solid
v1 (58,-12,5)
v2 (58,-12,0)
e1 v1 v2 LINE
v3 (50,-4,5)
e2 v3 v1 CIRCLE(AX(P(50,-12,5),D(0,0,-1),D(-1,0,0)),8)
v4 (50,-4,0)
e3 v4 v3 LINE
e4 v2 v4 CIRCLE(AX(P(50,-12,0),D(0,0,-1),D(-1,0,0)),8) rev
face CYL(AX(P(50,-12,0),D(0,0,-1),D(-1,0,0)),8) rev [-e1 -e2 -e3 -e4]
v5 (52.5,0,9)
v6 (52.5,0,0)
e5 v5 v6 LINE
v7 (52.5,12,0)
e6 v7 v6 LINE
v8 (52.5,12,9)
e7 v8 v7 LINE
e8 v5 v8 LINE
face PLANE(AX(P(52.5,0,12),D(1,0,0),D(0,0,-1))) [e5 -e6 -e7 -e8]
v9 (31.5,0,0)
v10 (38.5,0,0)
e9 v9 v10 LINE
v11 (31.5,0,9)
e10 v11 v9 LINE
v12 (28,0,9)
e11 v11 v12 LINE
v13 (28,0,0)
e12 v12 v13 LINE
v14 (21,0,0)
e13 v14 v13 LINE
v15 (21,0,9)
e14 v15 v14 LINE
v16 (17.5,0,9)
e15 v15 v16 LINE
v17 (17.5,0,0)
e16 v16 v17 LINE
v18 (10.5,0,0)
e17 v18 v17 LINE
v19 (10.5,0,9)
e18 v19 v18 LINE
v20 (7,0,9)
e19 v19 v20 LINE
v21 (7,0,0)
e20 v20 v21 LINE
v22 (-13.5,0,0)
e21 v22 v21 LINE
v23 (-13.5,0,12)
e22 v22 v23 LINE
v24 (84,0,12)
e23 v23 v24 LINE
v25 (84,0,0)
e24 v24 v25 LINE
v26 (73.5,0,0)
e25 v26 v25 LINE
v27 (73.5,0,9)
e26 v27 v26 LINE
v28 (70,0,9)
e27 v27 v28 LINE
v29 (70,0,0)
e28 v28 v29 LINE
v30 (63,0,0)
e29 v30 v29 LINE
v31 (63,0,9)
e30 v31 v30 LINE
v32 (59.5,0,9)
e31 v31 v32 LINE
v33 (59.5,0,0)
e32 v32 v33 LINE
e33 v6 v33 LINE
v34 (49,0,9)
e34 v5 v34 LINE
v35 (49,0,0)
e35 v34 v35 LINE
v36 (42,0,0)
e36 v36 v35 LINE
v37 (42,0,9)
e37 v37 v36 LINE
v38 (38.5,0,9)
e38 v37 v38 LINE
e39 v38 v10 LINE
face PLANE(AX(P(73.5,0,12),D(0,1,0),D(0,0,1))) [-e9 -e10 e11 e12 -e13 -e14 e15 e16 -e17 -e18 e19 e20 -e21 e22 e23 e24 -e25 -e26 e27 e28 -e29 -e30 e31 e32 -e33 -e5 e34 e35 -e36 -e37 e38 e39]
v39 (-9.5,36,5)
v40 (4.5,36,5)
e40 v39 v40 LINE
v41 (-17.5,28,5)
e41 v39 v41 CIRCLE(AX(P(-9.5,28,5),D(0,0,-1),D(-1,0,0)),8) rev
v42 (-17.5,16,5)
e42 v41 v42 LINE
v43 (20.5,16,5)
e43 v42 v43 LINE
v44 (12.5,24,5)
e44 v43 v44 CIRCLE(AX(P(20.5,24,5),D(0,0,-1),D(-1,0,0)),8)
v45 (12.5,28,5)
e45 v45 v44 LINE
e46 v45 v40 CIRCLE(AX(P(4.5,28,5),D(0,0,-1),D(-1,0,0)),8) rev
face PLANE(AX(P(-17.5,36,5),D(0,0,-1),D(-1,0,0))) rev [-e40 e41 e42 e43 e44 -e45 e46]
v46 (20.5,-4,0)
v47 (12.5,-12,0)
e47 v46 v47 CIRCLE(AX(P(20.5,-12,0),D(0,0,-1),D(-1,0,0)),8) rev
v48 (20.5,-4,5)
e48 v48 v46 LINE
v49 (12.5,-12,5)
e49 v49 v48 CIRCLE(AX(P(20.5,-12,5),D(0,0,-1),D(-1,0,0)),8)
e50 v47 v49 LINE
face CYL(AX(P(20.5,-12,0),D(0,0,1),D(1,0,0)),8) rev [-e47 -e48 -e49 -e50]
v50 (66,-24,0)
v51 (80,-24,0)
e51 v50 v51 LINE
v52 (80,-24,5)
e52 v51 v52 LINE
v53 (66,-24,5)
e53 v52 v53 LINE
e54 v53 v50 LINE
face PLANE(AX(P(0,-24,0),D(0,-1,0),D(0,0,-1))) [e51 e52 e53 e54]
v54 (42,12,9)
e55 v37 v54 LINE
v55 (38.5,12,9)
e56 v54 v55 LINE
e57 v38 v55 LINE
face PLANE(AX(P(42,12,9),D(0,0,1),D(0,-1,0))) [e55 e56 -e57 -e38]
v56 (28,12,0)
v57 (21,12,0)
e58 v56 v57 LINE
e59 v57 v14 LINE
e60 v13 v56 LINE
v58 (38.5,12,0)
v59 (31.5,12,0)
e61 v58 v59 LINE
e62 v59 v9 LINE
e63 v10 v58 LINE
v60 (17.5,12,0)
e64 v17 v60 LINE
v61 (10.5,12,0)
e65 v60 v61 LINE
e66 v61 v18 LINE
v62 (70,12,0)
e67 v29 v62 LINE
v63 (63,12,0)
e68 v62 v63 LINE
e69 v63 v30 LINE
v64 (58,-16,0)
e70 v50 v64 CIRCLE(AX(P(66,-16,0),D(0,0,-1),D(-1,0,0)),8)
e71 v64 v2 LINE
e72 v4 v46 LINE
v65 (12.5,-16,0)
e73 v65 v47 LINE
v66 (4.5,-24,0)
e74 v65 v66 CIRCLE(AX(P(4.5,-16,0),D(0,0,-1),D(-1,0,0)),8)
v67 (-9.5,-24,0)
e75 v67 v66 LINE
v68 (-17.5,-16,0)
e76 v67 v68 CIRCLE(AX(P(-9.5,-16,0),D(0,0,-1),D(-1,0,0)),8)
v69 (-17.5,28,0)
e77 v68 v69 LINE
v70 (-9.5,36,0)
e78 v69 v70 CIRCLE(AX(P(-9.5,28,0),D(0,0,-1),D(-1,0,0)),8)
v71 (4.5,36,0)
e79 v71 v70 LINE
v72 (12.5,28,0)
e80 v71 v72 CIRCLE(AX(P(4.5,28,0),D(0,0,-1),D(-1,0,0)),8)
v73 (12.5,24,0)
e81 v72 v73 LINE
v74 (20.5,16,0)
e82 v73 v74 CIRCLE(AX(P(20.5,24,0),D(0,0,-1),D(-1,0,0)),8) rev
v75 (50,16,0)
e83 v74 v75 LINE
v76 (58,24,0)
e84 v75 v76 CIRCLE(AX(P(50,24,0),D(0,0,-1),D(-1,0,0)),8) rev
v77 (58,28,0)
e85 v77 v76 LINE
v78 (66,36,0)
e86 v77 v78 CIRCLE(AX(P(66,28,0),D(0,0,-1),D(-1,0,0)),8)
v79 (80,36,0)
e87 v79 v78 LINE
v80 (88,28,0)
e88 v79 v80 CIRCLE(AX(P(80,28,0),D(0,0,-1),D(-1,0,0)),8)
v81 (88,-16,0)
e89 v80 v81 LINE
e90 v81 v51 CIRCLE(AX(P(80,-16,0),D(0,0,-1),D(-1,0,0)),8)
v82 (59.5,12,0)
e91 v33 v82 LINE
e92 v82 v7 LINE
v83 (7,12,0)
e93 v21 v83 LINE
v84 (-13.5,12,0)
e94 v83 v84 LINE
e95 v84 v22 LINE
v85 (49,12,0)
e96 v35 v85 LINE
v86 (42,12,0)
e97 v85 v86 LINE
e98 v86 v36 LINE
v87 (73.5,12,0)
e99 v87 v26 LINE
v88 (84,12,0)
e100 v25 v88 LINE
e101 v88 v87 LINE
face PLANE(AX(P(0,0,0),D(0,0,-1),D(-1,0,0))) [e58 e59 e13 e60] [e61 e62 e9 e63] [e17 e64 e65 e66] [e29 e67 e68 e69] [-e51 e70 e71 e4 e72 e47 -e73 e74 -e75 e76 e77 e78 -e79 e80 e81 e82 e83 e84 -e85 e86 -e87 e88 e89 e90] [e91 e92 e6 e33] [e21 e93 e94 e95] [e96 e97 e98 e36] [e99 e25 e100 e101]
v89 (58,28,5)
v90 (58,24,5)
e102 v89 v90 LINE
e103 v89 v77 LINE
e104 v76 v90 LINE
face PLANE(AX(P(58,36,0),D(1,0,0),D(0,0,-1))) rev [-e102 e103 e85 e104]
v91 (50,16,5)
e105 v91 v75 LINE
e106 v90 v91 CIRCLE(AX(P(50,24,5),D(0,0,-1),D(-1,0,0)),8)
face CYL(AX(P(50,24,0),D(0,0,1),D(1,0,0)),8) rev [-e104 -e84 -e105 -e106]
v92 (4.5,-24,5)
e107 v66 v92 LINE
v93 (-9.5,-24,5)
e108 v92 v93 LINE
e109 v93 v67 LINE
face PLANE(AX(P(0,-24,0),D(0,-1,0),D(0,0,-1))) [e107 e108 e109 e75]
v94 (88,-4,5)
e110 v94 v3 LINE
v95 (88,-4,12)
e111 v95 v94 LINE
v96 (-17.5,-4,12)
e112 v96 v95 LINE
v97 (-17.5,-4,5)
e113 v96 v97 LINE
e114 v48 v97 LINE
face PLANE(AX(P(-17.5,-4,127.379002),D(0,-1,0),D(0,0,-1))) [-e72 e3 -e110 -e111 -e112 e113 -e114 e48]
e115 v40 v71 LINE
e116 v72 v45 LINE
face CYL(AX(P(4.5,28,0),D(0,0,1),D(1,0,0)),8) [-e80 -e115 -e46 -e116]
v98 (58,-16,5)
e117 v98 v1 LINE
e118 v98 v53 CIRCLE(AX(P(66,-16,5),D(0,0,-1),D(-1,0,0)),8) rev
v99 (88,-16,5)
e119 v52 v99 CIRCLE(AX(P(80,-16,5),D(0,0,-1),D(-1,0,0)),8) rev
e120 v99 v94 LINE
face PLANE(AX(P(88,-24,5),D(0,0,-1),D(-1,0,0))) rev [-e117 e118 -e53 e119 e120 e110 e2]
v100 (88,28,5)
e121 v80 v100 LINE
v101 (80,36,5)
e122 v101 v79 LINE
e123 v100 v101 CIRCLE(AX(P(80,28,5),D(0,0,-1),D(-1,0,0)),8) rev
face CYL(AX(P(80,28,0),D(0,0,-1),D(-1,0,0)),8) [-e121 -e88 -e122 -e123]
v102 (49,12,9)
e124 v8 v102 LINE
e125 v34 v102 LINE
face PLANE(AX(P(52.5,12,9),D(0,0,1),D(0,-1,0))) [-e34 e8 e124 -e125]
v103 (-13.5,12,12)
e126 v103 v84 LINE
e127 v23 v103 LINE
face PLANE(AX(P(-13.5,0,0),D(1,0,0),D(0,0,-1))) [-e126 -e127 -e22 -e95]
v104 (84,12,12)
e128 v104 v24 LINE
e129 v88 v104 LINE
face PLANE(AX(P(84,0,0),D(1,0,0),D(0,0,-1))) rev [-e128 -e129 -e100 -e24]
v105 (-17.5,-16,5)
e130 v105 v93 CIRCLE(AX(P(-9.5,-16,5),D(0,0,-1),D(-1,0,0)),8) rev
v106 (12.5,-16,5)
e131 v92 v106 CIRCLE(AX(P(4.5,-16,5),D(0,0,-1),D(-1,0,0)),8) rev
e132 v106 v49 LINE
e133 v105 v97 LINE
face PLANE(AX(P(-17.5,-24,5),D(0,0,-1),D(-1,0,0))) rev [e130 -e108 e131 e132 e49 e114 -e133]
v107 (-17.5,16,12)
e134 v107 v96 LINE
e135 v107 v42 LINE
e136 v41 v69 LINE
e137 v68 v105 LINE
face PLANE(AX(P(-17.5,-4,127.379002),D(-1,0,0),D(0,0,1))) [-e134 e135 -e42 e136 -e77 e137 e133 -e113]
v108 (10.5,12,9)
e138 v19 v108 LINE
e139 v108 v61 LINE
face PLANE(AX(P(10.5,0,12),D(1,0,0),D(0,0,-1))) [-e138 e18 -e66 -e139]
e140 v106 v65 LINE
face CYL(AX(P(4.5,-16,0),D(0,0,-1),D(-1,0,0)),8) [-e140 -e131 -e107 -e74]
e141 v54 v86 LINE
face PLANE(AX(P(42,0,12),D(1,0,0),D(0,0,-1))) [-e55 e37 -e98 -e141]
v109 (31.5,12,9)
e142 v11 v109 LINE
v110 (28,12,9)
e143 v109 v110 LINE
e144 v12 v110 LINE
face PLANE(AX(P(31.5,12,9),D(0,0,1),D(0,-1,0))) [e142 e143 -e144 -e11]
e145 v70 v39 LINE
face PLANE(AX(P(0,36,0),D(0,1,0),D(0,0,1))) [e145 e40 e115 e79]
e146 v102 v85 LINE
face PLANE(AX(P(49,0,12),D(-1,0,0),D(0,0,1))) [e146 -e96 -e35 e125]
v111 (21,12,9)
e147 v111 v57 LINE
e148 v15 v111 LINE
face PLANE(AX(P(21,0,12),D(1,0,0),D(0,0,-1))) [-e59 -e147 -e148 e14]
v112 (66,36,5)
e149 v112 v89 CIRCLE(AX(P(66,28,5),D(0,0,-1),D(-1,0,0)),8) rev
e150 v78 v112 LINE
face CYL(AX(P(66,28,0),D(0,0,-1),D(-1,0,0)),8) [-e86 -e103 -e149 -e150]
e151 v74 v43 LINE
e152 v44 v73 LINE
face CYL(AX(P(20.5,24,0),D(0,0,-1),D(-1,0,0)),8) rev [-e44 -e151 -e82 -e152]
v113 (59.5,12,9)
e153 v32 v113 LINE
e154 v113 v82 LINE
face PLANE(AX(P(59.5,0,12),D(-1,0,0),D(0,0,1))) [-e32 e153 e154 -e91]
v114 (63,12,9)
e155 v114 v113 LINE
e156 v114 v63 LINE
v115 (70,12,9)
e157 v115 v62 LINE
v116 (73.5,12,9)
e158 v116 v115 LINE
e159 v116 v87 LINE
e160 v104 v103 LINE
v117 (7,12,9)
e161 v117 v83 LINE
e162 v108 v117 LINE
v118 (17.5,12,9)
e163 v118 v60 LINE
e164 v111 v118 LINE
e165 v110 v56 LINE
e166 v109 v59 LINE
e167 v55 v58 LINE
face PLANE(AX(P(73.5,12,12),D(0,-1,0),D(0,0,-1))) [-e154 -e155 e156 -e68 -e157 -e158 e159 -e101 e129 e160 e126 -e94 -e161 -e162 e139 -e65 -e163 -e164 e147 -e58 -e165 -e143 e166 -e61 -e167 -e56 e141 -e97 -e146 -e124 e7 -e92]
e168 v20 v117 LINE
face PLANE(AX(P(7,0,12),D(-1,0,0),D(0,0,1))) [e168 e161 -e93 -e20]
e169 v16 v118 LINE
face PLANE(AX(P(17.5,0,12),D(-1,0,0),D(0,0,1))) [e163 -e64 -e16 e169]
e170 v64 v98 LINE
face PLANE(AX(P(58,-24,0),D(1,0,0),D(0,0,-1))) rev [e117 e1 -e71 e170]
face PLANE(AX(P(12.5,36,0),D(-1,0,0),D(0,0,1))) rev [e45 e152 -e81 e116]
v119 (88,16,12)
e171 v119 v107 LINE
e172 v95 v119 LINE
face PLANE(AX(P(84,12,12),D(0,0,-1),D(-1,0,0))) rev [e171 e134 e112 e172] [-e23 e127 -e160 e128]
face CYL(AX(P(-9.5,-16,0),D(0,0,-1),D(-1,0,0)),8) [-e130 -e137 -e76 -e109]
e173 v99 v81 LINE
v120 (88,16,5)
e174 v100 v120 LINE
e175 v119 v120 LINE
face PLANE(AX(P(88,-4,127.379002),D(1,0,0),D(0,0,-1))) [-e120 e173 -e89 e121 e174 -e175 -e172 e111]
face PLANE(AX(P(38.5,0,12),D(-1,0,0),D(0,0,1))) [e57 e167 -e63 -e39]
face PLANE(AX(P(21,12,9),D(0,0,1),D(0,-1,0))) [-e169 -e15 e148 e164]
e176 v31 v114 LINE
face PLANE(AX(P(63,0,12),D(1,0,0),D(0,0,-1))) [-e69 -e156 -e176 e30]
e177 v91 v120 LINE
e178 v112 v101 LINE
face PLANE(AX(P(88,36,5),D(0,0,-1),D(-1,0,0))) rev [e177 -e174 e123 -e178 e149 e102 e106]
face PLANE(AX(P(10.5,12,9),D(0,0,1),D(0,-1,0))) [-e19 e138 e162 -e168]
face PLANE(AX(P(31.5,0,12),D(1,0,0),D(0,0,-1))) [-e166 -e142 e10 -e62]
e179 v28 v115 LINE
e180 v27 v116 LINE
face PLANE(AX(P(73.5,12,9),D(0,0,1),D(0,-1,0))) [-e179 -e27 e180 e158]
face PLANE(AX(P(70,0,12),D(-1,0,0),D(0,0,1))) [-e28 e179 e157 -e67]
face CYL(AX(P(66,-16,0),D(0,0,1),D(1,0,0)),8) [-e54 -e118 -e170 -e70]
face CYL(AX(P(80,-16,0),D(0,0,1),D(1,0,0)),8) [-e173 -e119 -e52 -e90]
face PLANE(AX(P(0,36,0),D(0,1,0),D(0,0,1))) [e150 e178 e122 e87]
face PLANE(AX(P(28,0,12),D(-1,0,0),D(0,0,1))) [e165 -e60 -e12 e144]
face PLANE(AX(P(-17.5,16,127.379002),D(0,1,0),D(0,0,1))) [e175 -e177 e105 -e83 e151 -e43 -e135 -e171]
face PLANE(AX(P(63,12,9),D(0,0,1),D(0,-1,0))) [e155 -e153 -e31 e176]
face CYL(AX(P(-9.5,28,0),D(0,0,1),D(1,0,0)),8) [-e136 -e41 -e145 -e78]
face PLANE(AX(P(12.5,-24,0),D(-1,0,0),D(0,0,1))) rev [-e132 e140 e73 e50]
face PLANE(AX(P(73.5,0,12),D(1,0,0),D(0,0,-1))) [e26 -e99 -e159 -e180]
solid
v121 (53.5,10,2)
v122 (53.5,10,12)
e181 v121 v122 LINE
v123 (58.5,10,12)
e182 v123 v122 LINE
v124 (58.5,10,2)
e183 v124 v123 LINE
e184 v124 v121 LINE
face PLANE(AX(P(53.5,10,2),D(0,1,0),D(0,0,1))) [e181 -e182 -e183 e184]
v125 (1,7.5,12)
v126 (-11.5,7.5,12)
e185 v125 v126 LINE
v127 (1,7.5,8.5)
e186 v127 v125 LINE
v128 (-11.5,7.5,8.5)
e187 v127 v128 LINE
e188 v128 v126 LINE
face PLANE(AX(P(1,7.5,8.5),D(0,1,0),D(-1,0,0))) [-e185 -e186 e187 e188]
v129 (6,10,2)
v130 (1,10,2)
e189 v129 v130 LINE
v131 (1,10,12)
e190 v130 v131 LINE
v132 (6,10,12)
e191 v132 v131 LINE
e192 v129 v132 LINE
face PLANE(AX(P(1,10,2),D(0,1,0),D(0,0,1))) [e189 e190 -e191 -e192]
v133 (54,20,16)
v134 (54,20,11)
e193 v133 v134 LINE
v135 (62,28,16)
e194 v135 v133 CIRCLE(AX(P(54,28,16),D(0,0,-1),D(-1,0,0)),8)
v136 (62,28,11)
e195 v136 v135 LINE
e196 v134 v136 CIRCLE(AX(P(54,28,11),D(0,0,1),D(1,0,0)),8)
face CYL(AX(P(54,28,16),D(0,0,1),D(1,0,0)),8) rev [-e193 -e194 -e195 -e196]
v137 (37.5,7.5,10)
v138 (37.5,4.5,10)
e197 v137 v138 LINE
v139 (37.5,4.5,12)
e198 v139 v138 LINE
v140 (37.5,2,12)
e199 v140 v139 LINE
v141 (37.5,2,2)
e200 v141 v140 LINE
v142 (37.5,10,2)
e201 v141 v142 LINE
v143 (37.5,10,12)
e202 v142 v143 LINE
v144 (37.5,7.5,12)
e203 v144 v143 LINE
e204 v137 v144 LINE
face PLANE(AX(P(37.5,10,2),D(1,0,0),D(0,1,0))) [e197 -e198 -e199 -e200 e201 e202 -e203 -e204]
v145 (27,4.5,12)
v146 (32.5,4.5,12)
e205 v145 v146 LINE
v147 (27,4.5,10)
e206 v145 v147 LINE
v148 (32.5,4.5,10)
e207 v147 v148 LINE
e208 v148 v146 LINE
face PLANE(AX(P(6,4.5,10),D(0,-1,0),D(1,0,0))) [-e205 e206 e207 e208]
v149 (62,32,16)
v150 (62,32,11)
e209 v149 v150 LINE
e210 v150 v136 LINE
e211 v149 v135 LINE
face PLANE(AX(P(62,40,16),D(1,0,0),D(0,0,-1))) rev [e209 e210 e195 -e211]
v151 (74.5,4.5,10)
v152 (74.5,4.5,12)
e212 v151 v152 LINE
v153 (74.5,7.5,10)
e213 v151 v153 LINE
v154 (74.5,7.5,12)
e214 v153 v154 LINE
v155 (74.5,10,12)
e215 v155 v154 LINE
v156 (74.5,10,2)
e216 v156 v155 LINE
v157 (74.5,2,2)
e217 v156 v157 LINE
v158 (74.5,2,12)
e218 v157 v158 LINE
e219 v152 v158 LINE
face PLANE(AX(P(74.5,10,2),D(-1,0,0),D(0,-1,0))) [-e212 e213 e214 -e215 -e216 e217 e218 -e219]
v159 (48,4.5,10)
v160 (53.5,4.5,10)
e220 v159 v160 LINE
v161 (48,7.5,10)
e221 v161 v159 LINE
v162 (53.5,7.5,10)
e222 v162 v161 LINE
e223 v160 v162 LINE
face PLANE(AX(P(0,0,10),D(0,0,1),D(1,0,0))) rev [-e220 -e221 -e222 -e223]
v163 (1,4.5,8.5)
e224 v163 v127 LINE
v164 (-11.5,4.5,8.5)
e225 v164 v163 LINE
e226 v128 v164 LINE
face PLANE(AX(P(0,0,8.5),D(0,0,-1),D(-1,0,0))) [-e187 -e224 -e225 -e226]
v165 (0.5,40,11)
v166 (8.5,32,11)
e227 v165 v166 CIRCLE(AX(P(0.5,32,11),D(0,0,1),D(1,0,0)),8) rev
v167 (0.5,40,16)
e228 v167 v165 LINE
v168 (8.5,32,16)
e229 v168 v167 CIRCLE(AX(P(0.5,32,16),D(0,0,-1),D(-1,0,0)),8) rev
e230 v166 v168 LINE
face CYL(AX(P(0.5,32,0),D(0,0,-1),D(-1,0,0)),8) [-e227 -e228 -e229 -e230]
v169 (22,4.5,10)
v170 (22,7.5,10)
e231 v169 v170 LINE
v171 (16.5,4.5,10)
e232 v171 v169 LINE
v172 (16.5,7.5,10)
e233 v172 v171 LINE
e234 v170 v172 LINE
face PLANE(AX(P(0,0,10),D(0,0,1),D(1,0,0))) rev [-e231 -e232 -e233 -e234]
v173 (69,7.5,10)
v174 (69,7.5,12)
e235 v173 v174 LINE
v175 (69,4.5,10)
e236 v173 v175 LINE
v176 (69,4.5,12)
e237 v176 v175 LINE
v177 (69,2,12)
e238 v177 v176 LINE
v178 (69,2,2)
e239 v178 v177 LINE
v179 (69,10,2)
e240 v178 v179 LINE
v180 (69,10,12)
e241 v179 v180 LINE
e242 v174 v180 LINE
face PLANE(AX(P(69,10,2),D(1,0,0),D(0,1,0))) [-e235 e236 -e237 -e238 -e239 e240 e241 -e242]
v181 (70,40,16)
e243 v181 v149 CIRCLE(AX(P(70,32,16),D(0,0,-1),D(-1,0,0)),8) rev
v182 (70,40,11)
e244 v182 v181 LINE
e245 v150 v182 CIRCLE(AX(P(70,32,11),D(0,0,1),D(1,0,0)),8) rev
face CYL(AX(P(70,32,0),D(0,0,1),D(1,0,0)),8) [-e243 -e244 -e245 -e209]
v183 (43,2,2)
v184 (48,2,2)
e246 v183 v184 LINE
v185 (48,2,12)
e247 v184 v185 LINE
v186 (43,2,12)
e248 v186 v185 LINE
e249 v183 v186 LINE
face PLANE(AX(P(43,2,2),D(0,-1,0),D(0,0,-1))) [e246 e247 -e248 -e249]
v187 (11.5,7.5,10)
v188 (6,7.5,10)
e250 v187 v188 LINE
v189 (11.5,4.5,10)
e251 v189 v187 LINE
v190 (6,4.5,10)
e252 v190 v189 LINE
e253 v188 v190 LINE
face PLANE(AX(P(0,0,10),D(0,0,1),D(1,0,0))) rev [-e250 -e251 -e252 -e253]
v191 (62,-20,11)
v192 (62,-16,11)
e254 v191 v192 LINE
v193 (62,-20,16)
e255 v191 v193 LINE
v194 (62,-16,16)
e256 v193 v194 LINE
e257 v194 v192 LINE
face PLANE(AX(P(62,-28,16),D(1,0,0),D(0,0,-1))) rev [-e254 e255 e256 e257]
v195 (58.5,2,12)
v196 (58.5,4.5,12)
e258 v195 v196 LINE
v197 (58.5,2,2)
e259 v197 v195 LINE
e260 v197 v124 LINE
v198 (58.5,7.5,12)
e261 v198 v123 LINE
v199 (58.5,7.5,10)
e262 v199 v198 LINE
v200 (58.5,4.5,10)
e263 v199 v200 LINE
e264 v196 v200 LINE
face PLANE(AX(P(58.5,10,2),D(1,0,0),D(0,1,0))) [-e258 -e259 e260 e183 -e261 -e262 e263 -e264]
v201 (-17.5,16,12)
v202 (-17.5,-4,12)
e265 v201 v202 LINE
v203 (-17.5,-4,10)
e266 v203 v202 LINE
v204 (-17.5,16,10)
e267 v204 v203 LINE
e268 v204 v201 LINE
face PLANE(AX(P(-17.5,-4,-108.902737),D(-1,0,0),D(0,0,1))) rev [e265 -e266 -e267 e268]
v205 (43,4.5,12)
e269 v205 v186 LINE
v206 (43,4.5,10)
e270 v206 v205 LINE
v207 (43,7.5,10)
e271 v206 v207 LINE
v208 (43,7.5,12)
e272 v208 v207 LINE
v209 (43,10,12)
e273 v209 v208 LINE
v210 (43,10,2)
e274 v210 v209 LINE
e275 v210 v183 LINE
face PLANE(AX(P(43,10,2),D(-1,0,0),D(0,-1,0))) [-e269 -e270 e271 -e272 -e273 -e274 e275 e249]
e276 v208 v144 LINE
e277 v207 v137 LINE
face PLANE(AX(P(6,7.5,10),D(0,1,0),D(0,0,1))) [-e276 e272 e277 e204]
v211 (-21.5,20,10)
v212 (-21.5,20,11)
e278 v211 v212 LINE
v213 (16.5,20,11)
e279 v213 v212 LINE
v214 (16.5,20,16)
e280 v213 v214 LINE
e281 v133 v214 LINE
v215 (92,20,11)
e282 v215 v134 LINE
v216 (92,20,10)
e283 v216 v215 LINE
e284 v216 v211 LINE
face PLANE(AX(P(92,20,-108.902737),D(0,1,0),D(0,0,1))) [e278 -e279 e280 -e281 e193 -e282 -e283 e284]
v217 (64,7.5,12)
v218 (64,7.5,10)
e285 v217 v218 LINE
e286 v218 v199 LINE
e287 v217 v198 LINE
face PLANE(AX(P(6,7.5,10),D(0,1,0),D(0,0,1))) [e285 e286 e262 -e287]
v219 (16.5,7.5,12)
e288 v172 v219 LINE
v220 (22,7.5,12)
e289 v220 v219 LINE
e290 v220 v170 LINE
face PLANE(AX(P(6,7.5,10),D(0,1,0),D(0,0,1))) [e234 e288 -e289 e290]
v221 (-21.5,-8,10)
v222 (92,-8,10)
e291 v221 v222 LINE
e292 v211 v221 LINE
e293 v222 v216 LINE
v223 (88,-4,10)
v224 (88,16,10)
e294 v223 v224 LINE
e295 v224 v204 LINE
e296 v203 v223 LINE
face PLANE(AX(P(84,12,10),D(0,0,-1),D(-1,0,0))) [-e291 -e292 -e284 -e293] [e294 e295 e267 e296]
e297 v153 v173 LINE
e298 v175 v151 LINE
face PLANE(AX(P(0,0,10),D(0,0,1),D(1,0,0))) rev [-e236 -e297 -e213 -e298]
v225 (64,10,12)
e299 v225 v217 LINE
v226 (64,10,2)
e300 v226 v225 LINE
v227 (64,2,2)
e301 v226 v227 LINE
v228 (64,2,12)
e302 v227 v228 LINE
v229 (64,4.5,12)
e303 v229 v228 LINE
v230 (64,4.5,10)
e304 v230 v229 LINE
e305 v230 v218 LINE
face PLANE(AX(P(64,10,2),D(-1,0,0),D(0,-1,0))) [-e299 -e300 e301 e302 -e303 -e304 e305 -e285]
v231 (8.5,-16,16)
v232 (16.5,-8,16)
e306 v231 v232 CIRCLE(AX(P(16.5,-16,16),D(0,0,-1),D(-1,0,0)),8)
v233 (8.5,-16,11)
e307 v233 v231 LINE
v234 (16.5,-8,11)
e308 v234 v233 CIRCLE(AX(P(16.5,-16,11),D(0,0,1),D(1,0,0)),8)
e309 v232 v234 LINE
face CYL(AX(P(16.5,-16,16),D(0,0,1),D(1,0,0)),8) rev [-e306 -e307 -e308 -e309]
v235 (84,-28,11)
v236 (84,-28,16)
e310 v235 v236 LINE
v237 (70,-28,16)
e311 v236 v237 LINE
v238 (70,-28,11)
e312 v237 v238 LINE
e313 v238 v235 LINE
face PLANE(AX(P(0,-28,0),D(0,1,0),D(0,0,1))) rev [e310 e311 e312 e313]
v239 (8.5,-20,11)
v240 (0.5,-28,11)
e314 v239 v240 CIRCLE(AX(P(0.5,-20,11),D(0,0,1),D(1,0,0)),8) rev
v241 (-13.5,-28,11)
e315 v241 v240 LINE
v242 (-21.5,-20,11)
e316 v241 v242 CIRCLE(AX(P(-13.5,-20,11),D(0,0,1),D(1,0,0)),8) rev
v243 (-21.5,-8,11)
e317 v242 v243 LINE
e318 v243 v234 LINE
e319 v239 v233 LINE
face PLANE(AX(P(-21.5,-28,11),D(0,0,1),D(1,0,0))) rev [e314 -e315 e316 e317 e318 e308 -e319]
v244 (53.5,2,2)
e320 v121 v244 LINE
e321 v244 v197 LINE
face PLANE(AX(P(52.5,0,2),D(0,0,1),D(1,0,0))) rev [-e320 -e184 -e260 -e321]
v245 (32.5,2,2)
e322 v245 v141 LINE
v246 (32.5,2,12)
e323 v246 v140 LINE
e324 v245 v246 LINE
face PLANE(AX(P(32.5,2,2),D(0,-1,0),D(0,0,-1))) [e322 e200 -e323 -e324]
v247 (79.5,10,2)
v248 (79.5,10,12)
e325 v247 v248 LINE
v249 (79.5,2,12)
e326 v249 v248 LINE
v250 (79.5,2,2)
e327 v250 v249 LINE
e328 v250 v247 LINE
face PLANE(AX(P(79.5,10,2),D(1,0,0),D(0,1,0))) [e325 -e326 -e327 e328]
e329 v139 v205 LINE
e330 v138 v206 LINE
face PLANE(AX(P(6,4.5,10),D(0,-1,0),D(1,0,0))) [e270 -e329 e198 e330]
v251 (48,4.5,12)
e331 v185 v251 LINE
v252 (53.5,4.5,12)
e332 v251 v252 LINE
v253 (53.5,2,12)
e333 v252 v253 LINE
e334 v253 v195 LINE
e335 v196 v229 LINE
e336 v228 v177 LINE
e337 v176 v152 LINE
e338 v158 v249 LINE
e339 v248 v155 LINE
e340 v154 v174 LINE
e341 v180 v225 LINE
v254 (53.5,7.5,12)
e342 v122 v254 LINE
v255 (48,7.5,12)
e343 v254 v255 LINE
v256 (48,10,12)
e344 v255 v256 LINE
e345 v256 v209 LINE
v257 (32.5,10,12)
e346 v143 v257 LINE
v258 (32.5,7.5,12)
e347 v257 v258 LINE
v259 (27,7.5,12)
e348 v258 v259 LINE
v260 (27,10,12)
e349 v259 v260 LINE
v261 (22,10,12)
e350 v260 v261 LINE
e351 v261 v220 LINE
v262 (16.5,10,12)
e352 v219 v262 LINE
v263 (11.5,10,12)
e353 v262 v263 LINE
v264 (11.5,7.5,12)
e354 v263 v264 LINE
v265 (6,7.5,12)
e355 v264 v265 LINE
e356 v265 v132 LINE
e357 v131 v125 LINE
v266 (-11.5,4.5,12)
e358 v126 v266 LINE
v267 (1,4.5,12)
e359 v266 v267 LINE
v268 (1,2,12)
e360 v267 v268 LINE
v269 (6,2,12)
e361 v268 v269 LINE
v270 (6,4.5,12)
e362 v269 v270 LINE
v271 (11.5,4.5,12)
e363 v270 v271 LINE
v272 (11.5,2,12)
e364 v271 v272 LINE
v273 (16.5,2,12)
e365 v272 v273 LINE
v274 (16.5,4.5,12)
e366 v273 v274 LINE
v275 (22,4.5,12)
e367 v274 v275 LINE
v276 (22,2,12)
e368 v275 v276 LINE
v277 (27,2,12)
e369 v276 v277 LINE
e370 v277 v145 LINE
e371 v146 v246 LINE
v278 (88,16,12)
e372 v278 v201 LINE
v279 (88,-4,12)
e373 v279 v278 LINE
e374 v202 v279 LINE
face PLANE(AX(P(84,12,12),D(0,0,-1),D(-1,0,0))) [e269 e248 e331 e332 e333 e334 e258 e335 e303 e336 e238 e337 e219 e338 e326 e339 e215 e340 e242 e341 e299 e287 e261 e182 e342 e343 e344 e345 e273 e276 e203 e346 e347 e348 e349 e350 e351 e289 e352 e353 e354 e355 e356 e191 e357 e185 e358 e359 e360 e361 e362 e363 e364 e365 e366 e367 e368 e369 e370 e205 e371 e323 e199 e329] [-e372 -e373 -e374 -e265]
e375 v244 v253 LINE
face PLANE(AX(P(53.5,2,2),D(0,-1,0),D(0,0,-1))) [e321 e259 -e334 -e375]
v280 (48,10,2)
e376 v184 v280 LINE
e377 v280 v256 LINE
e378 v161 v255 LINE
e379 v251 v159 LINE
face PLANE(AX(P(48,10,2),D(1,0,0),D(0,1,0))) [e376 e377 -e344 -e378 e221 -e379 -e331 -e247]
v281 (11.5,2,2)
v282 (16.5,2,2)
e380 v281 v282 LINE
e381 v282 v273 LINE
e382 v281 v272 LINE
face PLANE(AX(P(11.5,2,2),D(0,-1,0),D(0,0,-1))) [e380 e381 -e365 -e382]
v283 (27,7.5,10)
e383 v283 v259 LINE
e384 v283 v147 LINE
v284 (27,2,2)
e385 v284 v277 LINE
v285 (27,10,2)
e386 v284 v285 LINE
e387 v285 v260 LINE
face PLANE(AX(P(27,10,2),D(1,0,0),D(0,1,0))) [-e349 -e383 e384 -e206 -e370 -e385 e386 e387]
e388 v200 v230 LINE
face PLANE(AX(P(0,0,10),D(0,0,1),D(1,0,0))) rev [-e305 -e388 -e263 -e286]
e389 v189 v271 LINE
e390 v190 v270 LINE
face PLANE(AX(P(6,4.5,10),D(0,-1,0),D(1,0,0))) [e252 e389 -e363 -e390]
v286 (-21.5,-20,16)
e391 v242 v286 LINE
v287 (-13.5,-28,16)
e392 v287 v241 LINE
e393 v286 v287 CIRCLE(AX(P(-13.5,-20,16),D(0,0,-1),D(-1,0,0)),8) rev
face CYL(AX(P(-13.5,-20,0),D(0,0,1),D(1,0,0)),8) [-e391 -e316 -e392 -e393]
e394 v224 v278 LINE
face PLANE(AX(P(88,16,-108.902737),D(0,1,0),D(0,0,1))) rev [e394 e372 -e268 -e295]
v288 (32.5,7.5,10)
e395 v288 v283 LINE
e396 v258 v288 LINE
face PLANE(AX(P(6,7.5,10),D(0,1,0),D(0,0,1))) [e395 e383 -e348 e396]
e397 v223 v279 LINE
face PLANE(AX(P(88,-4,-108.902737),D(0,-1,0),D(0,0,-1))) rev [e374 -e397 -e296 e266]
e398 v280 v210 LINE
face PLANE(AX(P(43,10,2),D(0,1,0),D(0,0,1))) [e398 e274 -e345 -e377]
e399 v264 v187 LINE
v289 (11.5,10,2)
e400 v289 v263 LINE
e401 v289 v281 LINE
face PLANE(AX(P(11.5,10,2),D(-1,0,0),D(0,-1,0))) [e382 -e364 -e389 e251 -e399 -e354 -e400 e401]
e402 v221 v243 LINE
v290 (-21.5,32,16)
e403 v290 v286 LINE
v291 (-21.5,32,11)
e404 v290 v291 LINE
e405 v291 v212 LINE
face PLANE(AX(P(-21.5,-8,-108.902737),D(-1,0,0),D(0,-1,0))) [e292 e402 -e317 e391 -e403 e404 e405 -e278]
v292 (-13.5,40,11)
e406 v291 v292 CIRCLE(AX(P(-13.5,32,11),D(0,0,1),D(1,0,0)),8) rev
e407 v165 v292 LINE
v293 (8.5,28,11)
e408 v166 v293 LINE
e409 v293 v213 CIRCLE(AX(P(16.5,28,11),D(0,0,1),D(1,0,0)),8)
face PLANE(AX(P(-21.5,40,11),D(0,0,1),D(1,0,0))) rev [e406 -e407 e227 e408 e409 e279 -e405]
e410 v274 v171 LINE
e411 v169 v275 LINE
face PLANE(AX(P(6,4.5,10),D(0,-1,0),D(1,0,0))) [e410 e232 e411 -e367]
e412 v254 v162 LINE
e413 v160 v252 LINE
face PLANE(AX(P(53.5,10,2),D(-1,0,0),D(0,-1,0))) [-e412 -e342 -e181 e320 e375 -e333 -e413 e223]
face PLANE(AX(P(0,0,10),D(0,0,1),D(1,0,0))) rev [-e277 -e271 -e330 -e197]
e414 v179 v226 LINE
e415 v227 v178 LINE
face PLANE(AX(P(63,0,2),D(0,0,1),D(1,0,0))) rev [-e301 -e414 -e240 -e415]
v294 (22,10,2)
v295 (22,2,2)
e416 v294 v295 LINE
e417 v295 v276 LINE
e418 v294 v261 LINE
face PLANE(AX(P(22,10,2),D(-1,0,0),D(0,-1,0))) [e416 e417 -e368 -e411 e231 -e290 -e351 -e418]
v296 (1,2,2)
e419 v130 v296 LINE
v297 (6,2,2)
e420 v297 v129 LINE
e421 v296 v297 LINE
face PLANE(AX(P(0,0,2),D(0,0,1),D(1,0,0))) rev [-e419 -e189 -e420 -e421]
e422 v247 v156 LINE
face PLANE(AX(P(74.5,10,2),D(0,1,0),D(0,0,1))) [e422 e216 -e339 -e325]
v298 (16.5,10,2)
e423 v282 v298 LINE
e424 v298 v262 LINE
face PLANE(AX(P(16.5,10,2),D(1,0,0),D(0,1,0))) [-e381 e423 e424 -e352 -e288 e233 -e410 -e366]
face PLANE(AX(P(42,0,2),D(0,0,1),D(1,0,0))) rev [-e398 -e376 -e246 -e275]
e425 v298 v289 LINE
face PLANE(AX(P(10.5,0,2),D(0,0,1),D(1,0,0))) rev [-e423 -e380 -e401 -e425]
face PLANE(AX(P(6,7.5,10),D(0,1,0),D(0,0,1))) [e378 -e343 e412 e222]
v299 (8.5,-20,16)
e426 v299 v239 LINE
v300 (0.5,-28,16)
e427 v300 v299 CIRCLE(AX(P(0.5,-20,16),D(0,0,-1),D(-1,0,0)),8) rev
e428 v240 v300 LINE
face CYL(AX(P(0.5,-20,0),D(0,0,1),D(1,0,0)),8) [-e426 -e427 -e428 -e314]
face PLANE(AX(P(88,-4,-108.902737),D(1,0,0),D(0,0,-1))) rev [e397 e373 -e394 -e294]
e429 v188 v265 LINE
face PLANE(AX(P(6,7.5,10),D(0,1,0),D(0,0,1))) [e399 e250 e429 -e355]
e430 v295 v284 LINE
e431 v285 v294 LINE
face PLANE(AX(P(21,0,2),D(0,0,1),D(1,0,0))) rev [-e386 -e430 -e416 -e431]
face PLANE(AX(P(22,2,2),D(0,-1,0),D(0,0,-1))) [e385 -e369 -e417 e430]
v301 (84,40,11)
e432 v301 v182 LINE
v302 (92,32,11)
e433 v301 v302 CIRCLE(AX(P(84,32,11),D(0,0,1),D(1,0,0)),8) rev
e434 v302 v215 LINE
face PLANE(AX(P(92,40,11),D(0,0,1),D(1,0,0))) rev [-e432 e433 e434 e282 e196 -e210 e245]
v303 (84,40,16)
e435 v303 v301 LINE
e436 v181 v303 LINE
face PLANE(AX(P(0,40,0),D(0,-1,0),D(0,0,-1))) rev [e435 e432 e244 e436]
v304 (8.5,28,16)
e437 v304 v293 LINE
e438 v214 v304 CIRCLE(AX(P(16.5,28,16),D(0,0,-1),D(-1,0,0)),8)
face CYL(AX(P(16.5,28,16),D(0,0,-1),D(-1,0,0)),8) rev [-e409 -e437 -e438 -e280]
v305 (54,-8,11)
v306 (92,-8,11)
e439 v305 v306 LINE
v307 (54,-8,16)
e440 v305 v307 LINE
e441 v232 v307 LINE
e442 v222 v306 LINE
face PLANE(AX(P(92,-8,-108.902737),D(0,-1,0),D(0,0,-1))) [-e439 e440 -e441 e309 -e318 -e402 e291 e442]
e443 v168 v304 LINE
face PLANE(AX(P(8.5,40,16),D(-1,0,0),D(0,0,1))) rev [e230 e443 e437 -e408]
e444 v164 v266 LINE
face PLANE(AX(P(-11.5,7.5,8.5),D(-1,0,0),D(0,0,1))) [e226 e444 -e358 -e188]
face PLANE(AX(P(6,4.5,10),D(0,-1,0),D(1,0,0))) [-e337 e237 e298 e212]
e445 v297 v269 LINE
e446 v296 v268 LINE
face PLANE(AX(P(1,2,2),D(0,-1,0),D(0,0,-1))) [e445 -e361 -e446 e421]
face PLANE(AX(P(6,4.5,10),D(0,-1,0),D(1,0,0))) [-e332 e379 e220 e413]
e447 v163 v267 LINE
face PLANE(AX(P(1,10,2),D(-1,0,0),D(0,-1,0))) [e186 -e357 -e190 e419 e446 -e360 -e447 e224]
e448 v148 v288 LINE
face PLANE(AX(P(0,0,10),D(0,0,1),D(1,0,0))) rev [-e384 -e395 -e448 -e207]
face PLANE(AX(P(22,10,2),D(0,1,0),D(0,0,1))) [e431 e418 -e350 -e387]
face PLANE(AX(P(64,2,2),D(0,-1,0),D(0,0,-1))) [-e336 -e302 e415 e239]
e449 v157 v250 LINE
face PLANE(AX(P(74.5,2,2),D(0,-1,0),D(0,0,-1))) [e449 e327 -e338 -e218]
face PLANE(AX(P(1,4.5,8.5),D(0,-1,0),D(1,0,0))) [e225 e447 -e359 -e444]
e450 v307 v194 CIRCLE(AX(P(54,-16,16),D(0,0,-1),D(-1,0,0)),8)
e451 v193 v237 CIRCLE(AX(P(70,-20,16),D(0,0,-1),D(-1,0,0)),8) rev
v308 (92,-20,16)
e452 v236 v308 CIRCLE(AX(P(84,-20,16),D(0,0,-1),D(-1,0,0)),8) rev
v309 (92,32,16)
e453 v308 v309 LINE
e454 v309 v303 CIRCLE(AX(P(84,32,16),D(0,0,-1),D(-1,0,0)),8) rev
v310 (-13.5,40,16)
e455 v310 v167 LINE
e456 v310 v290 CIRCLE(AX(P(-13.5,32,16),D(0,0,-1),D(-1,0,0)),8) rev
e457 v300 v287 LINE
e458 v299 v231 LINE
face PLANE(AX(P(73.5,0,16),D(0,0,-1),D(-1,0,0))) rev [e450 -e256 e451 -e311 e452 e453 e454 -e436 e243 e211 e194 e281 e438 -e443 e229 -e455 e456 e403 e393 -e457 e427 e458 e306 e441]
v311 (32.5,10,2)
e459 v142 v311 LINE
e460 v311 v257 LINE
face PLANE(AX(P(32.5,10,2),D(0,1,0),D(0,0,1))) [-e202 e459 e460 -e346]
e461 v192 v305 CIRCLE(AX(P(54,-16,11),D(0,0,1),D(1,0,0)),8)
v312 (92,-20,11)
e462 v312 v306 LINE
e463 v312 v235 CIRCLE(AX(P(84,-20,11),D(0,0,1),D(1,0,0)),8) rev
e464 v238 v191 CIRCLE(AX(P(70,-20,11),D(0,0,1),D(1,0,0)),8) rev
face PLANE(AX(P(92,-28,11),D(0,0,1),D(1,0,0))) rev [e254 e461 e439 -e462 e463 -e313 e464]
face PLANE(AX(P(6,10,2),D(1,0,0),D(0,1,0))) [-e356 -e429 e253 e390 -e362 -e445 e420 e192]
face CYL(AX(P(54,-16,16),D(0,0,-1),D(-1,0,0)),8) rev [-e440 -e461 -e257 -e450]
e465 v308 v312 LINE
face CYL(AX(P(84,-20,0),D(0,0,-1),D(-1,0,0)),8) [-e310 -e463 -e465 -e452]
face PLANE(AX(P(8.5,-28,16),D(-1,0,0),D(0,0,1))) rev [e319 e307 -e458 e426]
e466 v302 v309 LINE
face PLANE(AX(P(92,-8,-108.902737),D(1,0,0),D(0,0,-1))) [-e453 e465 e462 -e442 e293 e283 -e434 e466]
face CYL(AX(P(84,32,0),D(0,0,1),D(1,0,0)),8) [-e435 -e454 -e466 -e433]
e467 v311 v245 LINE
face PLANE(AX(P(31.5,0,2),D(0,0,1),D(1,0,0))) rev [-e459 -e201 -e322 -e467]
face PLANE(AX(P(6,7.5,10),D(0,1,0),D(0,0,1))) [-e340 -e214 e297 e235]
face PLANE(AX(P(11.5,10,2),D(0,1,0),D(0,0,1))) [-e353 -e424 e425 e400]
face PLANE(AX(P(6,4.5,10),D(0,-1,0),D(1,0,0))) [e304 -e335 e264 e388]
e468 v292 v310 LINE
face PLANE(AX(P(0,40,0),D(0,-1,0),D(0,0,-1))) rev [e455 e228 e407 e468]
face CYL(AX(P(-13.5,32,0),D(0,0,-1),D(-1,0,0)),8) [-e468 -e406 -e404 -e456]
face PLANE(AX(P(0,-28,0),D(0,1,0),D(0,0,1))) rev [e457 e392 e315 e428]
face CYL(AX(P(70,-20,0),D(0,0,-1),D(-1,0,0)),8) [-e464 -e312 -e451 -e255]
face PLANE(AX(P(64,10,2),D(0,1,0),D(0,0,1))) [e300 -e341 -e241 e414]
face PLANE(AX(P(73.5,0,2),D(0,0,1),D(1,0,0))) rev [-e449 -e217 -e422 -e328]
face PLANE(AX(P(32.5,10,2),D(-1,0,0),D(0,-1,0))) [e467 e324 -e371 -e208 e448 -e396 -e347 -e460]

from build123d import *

# Parameters (mm, degrees)
SKETCH2_W            = 7
SKETCH2_H            = 12
BOSS_EXTRUDE1_DEPTH  = 12
SKETCH3_W            = 5
SKETCH3_H            = 8
CUT_EXTRUDE1_DEPTH   = 10
SKETCH4_W            = 3
SKETCH4_H            = 12
BOSS_EXTRUDE2_DEPTH  = 3.5
LPATTERN1_COUNT      = 8
LPATTERN1_PITCH      = 10.5
SKETCH5_W            = 9
SKETCH5_H            = 12
BOSS_EXTRUDE3_DEPTH  = 3.5
SKETCH6_W            = 12
SKETCH6_H            = 12
BOSS_EXTRUDE4_DEPTH  = 13.5
SKETCH7_W            = 12.5
SKETCH7_H            = 3
CUT_EXTRUDE2_DEPTH   = 3.5
SKETCH8_W            = 68.5
SKETCH8_H            = 3
CUT_EXTRUDE3_DEPTH   = 2
SKETCH11_W           = 105.5
SKETCH11_H           = 20
BOSS_EXTRUDE6_DEPTH  = 16
SPLIT1_START         = -4
SPLIT1_OUTLINE_W     = 105.5
SPLIT1_OUTLINE_H     = 4
SPLIT1_DEPTH         = 20
SPLIT1_START_2       = 2
SPLIT1_2_OUTLINE_W   = 5
SPLIT1_2_OUTLINE_H   = 10
SPLIT1_2_DEPTH       = 8
SPLIT1_START_3       = 4.5
SPLIT1_3_OUTLINE_W   = 5.5
SPLIT1_3_OUTLINE_H   = 2
SPLIT1_3_OUTLINE_W_2 = 12.5
SPLIT1_3_OUTLINE_H_2 = 3.5
SPLIT1_3_DEPTH       = 3
SPLIT1_START_4       = 12
SPLIT1_4_OUTLINE_W   = 105.5
SPLIT1_4_OUTLINE_H   = 20
SPLIT1_4_DEPTH       = 4
SPLIT1_5_OUTLINE_W   = 5
SPLIT1_5_OUTLINE_H   = 8
SPLIT1_5_DEPTH       = 10
SPLIT1_START_5       = 10
SPLIT1_6_OUTLINE_W   = 5.5
SPLIT1_6_OUTLINE_H   = 3
SPLIT1_6_DEPTH       = 2
SKETCH12_W           = 30
SKETCH12_H           = 5
BOSS_EXTRUDE7_DEPTH  = 20
SKETCH13_W           = 30
SKETCH13_H           = 5
BOSS_EXTRUDE8_DEPTH  = 20
FILLET1_R            = 8
SKETCH14_W           = 113.5
SKETCH14_H           = 28
SKETCH14_W_2         = 105.5
SKETCH14_H_2         = 20
BOSS_EXTRUDE9_DEPTH  = 6
SKETCH16_W           = 30
SKETCH16_H           = 5
BOSS_EXTRUDE10_DEPTH = 20
SKETCH17_W           = 30
SKETCH17_H           = 5
BOSS_EXTRUDE11_DEPTH = 20
FILLET2_R            = 8


# Read off the part's stored shape, not the designer's step: Split1
with BuildPart() as part:
    # Sketch2 → Boss-Extrude1 (new body)
    with BuildSketch(Plane.XY):
        with Locations((3.5, 6)):
            Rectangle(SKETCH2_W, SKETCH2_H)
    extrude(amount=BOSS_EXTRUDE1_DEPTH)

    # Sketch3 → Cut-Extrude1 (cut)
    with BuildSketch(Plane.XY.offset(12)):
        with Locations((3.5, 6)):
            Rectangle(SKETCH3_W, SKETCH3_H)
    extrude(amount=-CUT_EXTRUDE1_DEPTH, mode=Mode.SUBTRACT)

    # Sketch4 → Boss-Extrude2 (add)
    with BuildSketch(Plane(origin=(7, 0, 0), x_dir=(0, 0, -1), z_dir=(1, 0, 0))):
        with Locations((-10.5, 6)):
            Rectangle(SKETCH4_W, SKETCH4_H)
    extrude(amount=BOSS_EXTRUDE2_DEPTH)


with BuildPart() as lpattern1_1:
    # LPattern1: pattern copy
    add(part.part.moved(Location(Vector(1, 0, 0) * (1 * LPATTERN1_PITCH))))


with BuildPart() as lpattern1_2:
    # LPattern1: pattern copy
    add(part.part.moved(Location(Vector(1, 0, 0) * (2 * LPATTERN1_PITCH))))


with BuildPart() as lpattern1_3:
    # LPattern1: pattern copy
    add(part.part.moved(Location(Vector(1, 0, 0) * (3 * LPATTERN1_PITCH))))


with BuildPart() as lpattern1_4:
    # LPattern1: pattern copy
    add(part.part.moved(Location(Vector(1, 0, 0) * (4 * LPATTERN1_PITCH))))


with BuildPart() as lpattern1_5:
    # LPattern1: pattern copy
    add(part.part.moved(Location(Vector(1, 0, 0) * (5 * LPATTERN1_PITCH))))


with BuildPart() as lpattern1_6:
    # LPattern1: pattern copy
    add(part.part.moved(Location(Vector(1, 0, 0) * (6 * LPATTERN1_PITCH))))


with BuildPart() as lpattern1_7:
    # LPattern1: pattern copy
    add(part.part.moved(Location(Vector(1, 0, 0) * (7 * LPATTERN1_PITCH))))

    # Combine2: union LPattern1_4, LPattern1_1, part, LPattern1_6, LPattern1_3, LPattern1_5, LPattern1_2
    add(lpattern1_4.part)
    add(lpattern1_1.part)
    add(part.part)
    add(lpattern1_6.part)
    add(lpattern1_3.part)
    add(lpattern1_5.part)
    add(lpattern1_2.part)

    # Sketch5 → Boss-Extrude3 (add)
    with BuildSketch(Plane(origin=(80.5, 0, 0), x_dir=(0, 0, -1), z_dir=(1, 0, 0))):
        with Locations((-4.5, 6)):
            Rectangle(SKETCH5_W, SKETCH5_H)
    extrude(amount=BOSS_EXTRUDE3_DEPTH)

    # Sketch6 → Boss-Extrude4 (add)
    with BuildSketch(Plane.ZY):
        with Locations((6, 6)):
            Rectangle(SKETCH6_W, SKETCH6_H)
    extrude(amount=BOSS_EXTRUDE4_DEPTH)

    # Sketch7 → Cut-Extrude2 (cut)
    with BuildSketch(Plane.XY.offset(12)):
        with Locations((-5.25, 6)):
            Rectangle(SKETCH7_W, SKETCH7_H)
    extrude(amount=-CUT_EXTRUDE2_DEPTH, mode=Mode.SUBTRACT)

    # Sketch8 → Cut-Extrude3 (cut)
    with BuildSketch(Plane.XY.offset(12)):
        with Locations((40.25, 6)):
            Rectangle(SKETCH8_W, SKETCH8_H)
    extrude(amount=-CUT_EXTRUDE3_DEPTH, mode=Mode.SUBTRACT)


with BuildPart() as body_2:
    # Sketch11 → Boss-Extrude6 (new body)
    with BuildSketch(Plane(origin=(0, 0, 0), x_dir=(-1, 0, 0), z_dir=(0, 0, -1))):
        with Locations((-35.25, 6)):
            Rectangle(SKETCH11_W, SKETCH11_H)
    extrude(amount=-BOSS_EXTRUDE6_DEPTH)

    # Combine3: cut LPattern1_7
    add(lpattern1_7.part, mode=Mode.SUBTRACT)

    # Split1 4 outline → Split1 4 (cut)
    with BuildSketch(Plane.XY.offset(SPLIT1_START_4)):
        with Locations((35.25, 6)):
            Rectangle(SPLIT1_4_OUTLINE_W, SPLIT1_4_OUTLINE_H)
    extrude(amount=SPLIT1_4_DEPTH, mode=Mode.SUBTRACT)

    # Split1 5 outline → Split1 5 (cut)
    with BuildSketch(Plane.XY.offset(SPLIT1_START_2)):
        with Locations((77, 6)):
            Rectangle(SPLIT1_5_OUTLINE_W, SPLIT1_5_OUTLINE_H)
        with Locations((66.5, 6)):
            Rectangle(SPLIT1_5_OUTLINE_W, SPLIT1_5_OUTLINE_H)
        with Locations((56, 6)):
            Rectangle(SPLIT1_5_OUTLINE_W, SPLIT1_5_OUTLINE_H)
        with Locations((45.5, 6)):
            Rectangle(SPLIT1_5_OUTLINE_W, SPLIT1_5_OUTLINE_H)
        with Locations((35, 6)):
            Rectangle(SPLIT1_5_OUTLINE_W, SPLIT1_5_OUTLINE_H)
        with Locations((24.5, 6)):
            Rectangle(SPLIT1_5_OUTLINE_W, SPLIT1_5_OUTLINE_H)
        with Locations((14, 6)):
            Rectangle(SPLIT1_5_OUTLINE_W, SPLIT1_5_OUTLINE_H)
        Polygon((6, 10), (1, 10), (1, 7.5), (-11.5, 7.5), (-11.5, 4.5), (1, 4.5), (1, 2), (6, 2), align=None)
    extrude(amount=SPLIT1_5_DEPTH, mode=Mode.SUBTRACT)

    # Split1 6 outline → Split1 6 (cut)
    with BuildSketch(Plane.XY.offset(SPLIT1_START_5)):
        with Locations((71.75, 6)):
            Rectangle(SPLIT1_6_OUTLINE_W, SPLIT1_6_OUTLINE_H)
        with Locations((61.25, 6)):
            Rectangle(SPLIT1_6_OUTLINE_W, SPLIT1_6_OUTLINE_H)
        with Locations((50.75, 6)):
            Rectangle(SPLIT1_6_OUTLINE_W, SPLIT1_6_OUTLINE_H)
        with Locations((40.25, 6)):
            Rectangle(SPLIT1_6_OUTLINE_W, SPLIT1_6_OUTLINE_H)
        with Locations((29.75, 6)):
            Rectangle(SPLIT1_6_OUTLINE_W, SPLIT1_6_OUTLINE_H)
        with Locations((19.25, 6)):
            Rectangle(SPLIT1_6_OUTLINE_W, SPLIT1_6_OUTLINE_H)
        with Locations((8.75, 6)):
            Rectangle(SPLIT1_6_OUTLINE_W, SPLIT1_6_OUTLINE_H)
    extrude(amount=SPLIT1_6_DEPTH, mode=Mode.SUBTRACT)

    # Sketch12 → Boss-Extrude7 (add)
    with BuildSketch(Plane(origin=(0, 16, 0), x_dir=(1, 0, 0), z_dir=(0, 1, 0))):
        with Locations((-2.5, -2.5)):
            Rectangle(SKETCH12_W, SKETCH12_H)
        with Locations((73, -2.5)):
            Rectangle(SKETCH12_W, SKETCH12_H)
    extrude(amount=BOSS_EXTRUDE7_DEPTH)

    # Sketch13 → Boss-Extrude8 (add)
    with BuildSketch(Plane.XZ.offset(4)):
        with Locations((73, 2.5)):
            Rectangle(SKETCH13_W, SKETCH13_H)
        with Locations((-2.5, 2.5)):
            Rectangle(SKETCH13_W, SKETCH13_H)
    extrude(amount=BOSS_EXTRUDE8_DEPTH)

    # Fillet1
    fillet1_edges = [body_2.edges().sort_by_distance(p)[0] for p in [
        (58, 16, 2.5),
        (58, 36, 2.5),
        (88, 36, 2.5),
        (58, -4, 2.5),
        (88, -24, 2.5),
        (58, -24, 2.5),
        (12.5, -4, 2.5),
        (12.5, -24, 2.5),
        (-17.5, -24, 2.5),
        (12.5, 16, 2.5),
        (-17.5, 36, 2.5),
        (12.5, 36, 2.5),
    ]]
    fillet(fillet1_edges, radius=FILLET1_R)


with BuildPart() as body_2_2:
    # Split1 outline → Split1 (new body)
    with BuildSketch(Plane(origin=(0, 0, 0), x_dir=(1, 0, 0), z_dir=(0, 1, 0)).offset(SPLIT1_START)):
        with Locations((35.25, -14)):
            Rectangle(SPLIT1_OUTLINE_W, SPLIT1_OUTLINE_H)
    extrude(amount=SPLIT1_DEPTH)

    # Split1 2 outline → Split1 2 (add)
    with BuildSketch(Plane(origin=(0, 0, 0), x_dir=(1, 0, 0), z_dir=(0, 1, 0)).offset(SPLIT1_START_2)):
        with Locations((77, -7)):
            Rectangle(SPLIT1_2_OUTLINE_W, SPLIT1_2_OUTLINE_H)
        with Locations((66.5, -7)):
            Rectangle(SPLIT1_2_OUTLINE_W, SPLIT1_2_OUTLINE_H)
        with Locations((56, -7)):
            Rectangle(SPLIT1_2_OUTLINE_W, SPLIT1_2_OUTLINE_H)
        with Locations((3.5, -7)):
            Rectangle(SPLIT1_2_OUTLINE_W, SPLIT1_2_OUTLINE_H)
        with Locations((45.5, -7)):
            Rectangle(SPLIT1_2_OUTLINE_W, SPLIT1_2_OUTLINE_H)
        with Locations((14, -7)):
            Rectangle(SPLIT1_2_OUTLINE_W, SPLIT1_2_OUTLINE_H)
        with Locations((35, -7)):
            Rectangle(SPLIT1_2_OUTLINE_W, SPLIT1_2_OUTLINE_H)
        with Locations((24.5, -7)):
            Rectangle(SPLIT1_2_OUTLINE_W, SPLIT1_2_OUTLINE_H)
    extrude(amount=SPLIT1_2_DEPTH)

    # Split1 3 outline → Split1 3 (add)
    with BuildSketch(Plane(origin=(0, 0, 0), x_dir=(1, 0, 0), z_dir=(0, 1, 0)).offset(SPLIT1_START_3)):
        with Locations((71.75, -11)):
            Rectangle(SPLIT1_3_OUTLINE_W, SPLIT1_3_OUTLINE_H)
        with Locations((61.25, -11)):
            Rectangle(SPLIT1_3_OUTLINE_W, SPLIT1_3_OUTLINE_H)
        with Locations((-5.25, -10.25)):
            Rectangle(SPLIT1_3_OUTLINE_W_2, SPLIT1_3_OUTLINE_H_2)
        with Locations((50.75, -11)):
            Rectangle(SPLIT1_3_OUTLINE_W, SPLIT1_3_OUTLINE_H)
        with Locations((8.75, -11)):
            Rectangle(SPLIT1_3_OUTLINE_W, SPLIT1_3_OUTLINE_H)
        with Locations((40.25, -11)):
            Rectangle(SPLIT1_3_OUTLINE_W, SPLIT1_3_OUTLINE_H)
        with Locations((19.25, -11)):
            Rectangle(SPLIT1_3_OUTLINE_W, SPLIT1_3_OUTLINE_H)
        with Locations((29.75, -11)):
            Rectangle(SPLIT1_3_OUTLINE_W, SPLIT1_3_OUTLINE_H)
    extrude(amount=SPLIT1_3_DEPTH)

    # Sketch14 → Boss-Extrude9 (add)
    with BuildSketch(Plane.XY.offset(16)):
        with Locations((35.25, 6)):
            Rectangle(SKETCH14_W, SKETCH14_H)
        with Locations((35.25, 6)):
            Rectangle(SKETCH14_W_2, SKETCH14_H_2, mode=Mode.SUBTRACT)
    extrude(amount=-BOSS_EXTRUDE9_DEPTH)

    # Sketch16 → Boss-Extrude10 (add)
    with BuildSketch(Plane.XZ.offset(8)):
        with Locations((-6.5, 13.5)):
            Rectangle(SKETCH16_W, SKETCH16_H)
        with Locations((77, 13.5)):
            Rectangle(SKETCH16_W, SKETCH16_H)
    extrude(amount=BOSS_EXTRUDE10_DEPTH)

    # Sketch17 → Boss-Extrude11 (add)
    with BuildSketch(Plane(origin=(0, 20, 0), x_dir=(1, 0, 0), z_dir=(0, 1, 0))):
        with Locations((77, -13.5)):
            Rectangle(SKETCH17_W, SKETCH17_H)
        with Locations((-6.5, -13.5)):
            Rectangle(SKETCH17_W, SKETCH17_H)
    extrude(amount=BOSS_EXTRUDE11_DEPTH)

    # Fillet2
    fillet2_edges = [body_2_2.edges().sort_by_distance(p)[0] for p in [
        (62, -8, 13.5),
        (92, -28, 13.5),
        (62, -28, 13.5),
        (8.5, -8, 13.5),
        (-21.5, -28, 13.5),
        (8.5, -28, 13.5),
        (8.5, 20, 13.5),
        (-21.5, 40, 13.5),
        (8.5, 40, 13.5),
        (62, 20, 13.5),
        (92, 40, 13.5),
        (62, 40, 13.5),
    ]]
    fillet(fillet2_edges, radius=FILLET2_R)


solid = Compound([body_2.part, body_2_2.part])
